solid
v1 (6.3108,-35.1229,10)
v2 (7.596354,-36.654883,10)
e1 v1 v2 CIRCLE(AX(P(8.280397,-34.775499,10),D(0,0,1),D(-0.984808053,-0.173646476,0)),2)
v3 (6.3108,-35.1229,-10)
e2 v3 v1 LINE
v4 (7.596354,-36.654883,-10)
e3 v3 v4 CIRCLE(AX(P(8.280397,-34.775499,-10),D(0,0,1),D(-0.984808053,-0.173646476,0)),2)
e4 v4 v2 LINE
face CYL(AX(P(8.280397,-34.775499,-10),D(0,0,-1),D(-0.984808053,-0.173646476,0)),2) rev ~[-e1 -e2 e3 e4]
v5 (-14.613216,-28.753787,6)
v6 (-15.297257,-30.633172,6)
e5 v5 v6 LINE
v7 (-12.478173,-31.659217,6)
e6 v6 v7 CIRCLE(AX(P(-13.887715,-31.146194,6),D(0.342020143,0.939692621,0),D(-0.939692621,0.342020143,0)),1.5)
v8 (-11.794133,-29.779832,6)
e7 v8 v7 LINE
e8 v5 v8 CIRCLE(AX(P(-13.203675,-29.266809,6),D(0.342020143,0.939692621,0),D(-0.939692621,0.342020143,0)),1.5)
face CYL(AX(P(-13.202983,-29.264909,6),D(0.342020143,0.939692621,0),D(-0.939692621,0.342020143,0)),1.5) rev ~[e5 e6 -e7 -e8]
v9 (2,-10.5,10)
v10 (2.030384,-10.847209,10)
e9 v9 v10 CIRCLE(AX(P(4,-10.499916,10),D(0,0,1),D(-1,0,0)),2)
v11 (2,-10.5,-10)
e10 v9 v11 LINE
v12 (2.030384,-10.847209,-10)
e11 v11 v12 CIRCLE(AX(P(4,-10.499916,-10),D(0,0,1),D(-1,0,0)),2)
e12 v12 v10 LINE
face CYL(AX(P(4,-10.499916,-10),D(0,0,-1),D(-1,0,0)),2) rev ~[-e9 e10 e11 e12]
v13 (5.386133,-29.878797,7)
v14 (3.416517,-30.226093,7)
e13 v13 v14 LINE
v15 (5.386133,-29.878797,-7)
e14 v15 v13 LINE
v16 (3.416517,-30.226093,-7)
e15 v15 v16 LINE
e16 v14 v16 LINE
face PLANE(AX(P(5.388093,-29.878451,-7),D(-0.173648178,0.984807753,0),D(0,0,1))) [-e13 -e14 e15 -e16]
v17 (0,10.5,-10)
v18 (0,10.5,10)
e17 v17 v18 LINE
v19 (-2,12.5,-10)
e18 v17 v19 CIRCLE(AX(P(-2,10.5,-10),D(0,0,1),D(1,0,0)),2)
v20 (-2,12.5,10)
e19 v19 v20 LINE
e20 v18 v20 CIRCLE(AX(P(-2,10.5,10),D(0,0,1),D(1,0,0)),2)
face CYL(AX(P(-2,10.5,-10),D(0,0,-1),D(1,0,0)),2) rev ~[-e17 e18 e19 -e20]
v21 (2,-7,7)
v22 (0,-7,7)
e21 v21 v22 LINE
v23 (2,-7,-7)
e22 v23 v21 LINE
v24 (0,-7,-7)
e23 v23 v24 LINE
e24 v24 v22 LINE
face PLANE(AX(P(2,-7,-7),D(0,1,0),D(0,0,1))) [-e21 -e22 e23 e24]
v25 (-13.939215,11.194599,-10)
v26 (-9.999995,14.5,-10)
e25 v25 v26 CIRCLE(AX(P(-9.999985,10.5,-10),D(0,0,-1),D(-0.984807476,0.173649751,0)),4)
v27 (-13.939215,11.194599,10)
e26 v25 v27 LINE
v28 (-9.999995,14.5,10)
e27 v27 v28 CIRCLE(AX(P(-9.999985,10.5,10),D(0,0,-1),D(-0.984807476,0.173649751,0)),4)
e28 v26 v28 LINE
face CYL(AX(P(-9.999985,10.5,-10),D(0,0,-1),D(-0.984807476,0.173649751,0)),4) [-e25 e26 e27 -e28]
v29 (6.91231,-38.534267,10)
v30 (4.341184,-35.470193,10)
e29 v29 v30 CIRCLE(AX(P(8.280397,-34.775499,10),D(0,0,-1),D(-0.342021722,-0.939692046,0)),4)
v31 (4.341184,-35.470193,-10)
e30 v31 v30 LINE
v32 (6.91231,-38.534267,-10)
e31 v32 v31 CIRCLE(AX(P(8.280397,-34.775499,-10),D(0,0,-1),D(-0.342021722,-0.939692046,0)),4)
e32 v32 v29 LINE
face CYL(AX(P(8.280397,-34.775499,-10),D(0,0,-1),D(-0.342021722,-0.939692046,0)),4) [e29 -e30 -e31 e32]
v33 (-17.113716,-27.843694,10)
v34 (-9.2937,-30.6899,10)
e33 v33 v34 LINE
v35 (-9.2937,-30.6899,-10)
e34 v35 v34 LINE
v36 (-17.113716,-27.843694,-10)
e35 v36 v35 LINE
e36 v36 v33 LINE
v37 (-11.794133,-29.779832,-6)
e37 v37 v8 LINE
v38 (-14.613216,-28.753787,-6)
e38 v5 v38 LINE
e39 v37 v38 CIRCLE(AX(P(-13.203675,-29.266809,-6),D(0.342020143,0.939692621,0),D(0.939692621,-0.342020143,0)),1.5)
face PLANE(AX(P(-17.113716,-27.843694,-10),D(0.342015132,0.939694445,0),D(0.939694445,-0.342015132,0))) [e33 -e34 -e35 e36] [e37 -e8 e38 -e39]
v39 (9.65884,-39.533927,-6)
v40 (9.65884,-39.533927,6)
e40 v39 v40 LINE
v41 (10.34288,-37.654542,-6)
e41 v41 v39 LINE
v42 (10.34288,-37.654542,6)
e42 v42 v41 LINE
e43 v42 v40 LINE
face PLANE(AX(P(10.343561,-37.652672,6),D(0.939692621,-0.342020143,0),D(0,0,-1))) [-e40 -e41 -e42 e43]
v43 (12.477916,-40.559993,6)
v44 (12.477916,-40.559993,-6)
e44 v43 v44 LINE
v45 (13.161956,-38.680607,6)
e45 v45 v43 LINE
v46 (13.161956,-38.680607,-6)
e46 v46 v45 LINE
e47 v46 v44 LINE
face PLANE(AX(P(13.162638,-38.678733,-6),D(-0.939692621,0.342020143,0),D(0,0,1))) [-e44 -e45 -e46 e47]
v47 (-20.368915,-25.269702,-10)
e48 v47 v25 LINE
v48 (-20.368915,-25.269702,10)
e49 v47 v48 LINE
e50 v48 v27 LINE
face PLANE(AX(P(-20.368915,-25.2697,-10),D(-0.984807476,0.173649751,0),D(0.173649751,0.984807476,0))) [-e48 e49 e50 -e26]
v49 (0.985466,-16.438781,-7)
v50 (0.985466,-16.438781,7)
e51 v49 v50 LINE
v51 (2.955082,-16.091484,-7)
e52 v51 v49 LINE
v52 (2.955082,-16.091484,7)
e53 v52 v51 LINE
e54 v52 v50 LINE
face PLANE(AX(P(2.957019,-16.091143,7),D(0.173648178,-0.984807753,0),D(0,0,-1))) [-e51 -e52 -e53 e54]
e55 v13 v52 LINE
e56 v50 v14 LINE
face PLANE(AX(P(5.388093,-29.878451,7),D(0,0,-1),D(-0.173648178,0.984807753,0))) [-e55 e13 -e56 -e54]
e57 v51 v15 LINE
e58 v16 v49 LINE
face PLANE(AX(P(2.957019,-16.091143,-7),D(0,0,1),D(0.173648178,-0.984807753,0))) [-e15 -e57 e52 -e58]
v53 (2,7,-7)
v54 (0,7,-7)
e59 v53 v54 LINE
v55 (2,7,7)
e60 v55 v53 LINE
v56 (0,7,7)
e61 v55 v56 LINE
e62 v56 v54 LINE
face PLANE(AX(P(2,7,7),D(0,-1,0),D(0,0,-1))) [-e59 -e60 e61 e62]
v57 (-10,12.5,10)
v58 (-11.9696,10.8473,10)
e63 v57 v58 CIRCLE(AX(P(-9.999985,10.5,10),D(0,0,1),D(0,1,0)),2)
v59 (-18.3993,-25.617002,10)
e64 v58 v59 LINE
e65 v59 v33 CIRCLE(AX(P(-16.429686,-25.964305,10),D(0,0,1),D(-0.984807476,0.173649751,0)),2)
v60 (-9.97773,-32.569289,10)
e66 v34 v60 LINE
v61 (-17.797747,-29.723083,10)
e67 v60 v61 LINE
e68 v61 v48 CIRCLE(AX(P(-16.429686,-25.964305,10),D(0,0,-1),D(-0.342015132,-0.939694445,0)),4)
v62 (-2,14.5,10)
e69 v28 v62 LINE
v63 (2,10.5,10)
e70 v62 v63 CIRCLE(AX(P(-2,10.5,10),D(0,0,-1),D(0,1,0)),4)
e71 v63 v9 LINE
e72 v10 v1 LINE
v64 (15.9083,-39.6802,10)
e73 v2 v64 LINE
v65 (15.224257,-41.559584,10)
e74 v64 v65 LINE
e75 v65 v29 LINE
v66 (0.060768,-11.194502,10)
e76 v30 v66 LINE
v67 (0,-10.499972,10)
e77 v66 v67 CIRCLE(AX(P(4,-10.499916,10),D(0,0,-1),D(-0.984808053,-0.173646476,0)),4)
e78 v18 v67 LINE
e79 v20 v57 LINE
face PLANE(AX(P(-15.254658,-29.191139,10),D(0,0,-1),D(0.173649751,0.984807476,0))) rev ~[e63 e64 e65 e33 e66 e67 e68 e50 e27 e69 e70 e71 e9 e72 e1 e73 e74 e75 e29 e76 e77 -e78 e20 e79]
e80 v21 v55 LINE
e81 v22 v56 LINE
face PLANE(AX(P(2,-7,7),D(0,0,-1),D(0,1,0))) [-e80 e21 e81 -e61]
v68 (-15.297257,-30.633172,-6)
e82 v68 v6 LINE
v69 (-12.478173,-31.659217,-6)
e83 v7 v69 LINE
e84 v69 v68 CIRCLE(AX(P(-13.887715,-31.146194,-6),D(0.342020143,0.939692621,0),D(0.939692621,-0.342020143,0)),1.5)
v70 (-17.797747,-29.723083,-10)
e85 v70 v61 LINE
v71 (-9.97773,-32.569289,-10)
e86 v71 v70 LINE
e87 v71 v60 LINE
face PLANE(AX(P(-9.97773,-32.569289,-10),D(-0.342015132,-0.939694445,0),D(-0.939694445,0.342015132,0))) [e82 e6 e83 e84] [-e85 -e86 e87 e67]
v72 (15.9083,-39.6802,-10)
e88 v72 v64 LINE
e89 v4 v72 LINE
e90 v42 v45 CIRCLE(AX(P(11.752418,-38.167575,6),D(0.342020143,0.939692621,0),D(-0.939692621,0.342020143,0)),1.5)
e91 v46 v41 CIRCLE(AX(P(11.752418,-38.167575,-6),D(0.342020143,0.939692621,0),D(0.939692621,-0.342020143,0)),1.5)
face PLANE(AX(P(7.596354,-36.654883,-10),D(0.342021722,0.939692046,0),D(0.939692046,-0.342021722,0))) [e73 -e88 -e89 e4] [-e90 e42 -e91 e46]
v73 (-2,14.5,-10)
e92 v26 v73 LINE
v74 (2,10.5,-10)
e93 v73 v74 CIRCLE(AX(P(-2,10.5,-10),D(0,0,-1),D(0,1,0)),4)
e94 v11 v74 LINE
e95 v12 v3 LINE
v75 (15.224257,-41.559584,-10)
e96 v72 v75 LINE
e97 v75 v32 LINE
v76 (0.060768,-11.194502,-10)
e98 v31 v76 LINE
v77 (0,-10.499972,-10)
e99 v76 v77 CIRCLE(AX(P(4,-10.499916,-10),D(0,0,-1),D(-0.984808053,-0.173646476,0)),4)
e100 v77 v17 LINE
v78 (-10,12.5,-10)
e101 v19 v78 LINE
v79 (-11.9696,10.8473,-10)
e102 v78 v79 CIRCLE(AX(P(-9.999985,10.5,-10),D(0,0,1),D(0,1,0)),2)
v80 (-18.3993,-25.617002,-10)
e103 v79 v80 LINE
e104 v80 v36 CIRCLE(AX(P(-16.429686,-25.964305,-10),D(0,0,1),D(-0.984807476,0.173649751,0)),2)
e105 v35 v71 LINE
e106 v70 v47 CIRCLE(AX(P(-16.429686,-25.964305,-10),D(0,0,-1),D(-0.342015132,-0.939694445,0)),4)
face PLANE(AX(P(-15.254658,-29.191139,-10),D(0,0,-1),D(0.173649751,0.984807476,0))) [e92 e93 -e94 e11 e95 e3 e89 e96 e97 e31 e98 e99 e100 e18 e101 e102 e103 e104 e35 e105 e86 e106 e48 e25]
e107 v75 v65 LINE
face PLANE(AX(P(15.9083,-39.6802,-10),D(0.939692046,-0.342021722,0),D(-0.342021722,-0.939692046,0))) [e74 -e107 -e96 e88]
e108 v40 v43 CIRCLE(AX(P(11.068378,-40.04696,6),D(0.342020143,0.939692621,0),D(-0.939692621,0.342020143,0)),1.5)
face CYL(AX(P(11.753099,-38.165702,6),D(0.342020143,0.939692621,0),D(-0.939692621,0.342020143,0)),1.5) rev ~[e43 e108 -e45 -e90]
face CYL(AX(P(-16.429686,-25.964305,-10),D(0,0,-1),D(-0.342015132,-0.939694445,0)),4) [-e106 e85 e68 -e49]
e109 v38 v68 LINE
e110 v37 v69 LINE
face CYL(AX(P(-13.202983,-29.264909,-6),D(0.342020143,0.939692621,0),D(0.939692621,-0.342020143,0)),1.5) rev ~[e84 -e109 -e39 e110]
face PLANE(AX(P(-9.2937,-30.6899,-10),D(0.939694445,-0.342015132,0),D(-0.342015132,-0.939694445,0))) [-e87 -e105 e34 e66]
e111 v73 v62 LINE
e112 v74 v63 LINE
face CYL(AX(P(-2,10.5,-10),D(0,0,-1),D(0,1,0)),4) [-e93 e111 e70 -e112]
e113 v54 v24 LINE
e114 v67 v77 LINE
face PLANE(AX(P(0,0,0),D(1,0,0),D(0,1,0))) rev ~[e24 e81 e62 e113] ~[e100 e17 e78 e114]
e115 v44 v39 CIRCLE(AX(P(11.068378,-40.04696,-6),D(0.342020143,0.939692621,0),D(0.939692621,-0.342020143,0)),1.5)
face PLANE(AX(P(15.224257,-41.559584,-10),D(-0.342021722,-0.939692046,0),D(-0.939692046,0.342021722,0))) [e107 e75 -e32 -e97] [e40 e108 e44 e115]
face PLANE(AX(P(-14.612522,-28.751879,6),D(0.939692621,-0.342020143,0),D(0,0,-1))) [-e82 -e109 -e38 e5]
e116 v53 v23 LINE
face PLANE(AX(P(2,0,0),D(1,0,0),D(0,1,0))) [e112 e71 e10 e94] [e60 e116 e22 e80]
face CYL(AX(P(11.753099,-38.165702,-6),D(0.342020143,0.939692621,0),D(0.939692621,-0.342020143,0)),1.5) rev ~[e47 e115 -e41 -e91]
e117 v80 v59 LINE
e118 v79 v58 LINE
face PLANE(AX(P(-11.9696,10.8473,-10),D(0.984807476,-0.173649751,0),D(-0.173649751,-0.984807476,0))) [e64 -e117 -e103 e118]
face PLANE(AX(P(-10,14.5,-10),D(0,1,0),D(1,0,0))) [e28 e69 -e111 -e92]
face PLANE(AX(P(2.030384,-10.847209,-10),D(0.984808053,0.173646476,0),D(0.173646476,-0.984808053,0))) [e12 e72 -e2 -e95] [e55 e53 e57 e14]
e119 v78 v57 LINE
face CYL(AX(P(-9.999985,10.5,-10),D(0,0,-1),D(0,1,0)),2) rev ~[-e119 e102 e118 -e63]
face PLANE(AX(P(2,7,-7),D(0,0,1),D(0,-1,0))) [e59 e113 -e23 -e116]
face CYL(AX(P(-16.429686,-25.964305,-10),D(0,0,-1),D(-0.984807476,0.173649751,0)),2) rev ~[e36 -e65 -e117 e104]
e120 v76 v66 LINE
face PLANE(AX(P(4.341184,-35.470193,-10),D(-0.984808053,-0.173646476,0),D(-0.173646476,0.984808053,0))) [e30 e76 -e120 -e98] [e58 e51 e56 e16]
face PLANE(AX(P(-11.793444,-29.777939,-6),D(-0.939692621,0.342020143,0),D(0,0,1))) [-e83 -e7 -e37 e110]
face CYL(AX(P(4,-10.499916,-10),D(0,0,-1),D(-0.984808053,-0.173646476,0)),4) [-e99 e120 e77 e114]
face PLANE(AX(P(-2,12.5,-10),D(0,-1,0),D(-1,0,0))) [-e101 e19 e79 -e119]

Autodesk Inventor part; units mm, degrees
ref_plane "YZ Plane" through (0, 0, 0) normal (1, 0, 0) x (0, 1, 0)
ref_plane "XZ Plane" through (0, 0, 0) normal (0, 1, 0) x (-1, 0, 0)
ref_plane "XY Plane" through (0, 0, 0) normal (0, 0, 1) x (1, 0, 0)
sketch "スケッチ1" plane through (0, 0, 0) normal (1, 0, 0) x (0, 1, 0)
  line L0 (-10.5, -10) -> (10.5, -10)
  line L1 (10.5, -10) -> (10.5, 10)
  line L2 (10.5, 10) -> (-10.5, 10)
  line L3 (-10.5, 10) -> (-10.5, -10)
  line L4 (-10.5, -10) -> (10.5, 10) construction
  line L5 (10.5, -10) -> (-10.5, 10) construction
  point P0 (0, 0)
  dimension "d0" = 21
  dimension "d1" = 20
extrude "プレート1" add sketch "スケッチ1" along normal blind 2
sketch "スケッチ3" plane through (2.0304, -10.8473, -10) normal (-0.9848078, -0.1736482, 0) x (0.1736482, -0.9848078, 0)
  line L0 (0, 20) -> (0, 0)
  line L1 (0, 0) -> (24.65, 0)
  line L2 (24.65, 0) -> (24.65, 20)
  line L3 (24.65, 20) -> (0, 20)
edge flange "フランジ2" height 25 angle 10 thickness 2 bend radius 2 thickness toward (-0.9848078, -0.1736482, 0) relief tear relief width 2 relief depth 1 edges at (2, -10.5, 0) wall of the first edge with corners at (2.0304, -10.8473, 10) (2.0304, -10.8473, -10) (6.3108, -35.1229, -10) (6.3108, -35.1229, 10)
bend "曲げ2"
corner "コーナー2"
sketch "スケッチ5" plane through (2, 0, 0) normal (1, 0, 0) x (0, 0, -1)
  line L0 (7, -7) -> (-7, -7)
  line L1 (-7, -7) -> (-7, 7)
  line L2 (-7, 7) -> (7, 7)
  line L3 (7, 7) -> (7, -7)
  line L4 (7, -7) -> (-7, 7) construction
  line L5 (-7, -7) -> (7, 7) construction
  point P0 (0, 0)
  dimension "d27" = 14
  dimension "d28" = 14
extrude "押し出し2" cut sketch "スケッチ5" against normal blind 10
sketch "スケッチ6" plane through (6.3108, -35.1229, 10) normal (0.9848078, 0.1736482, 0) x (0, 0, -1)
  line L0 (17, 5.325) -> (3, 5.325)
  line L1 (3, 5.325) -> (3, 19.325)
  line L2 (3, 19.325) -> (17, 19.325)
  line L3 (17, 19.325) -> (17, 5.325)
  line L4 (17, 5.325) -> (3, 19.325) construction
  line L5 (3, 5.325) -> (17, 19.325) construction
  line L6 (20, 0) -> (20, 24.65) projected
  line L7 (17, 28.4442) -> (3, 28.4442) projected
  point P0 (10, 35.6851)
  point P1 (10, 12.325)
  point P2 (10, 12.325)
  point P3 (20, 12.325)
  point P4 (10, 12.325)
  point P5 (10, 28.4442)
  dimension "d31" = 14
  dimension "d32" = 14
extrude "押し出し3" cut sketch "スケッチ6" against normal blind 10
sketch "スケッチ7" plane through (7.5964, -36.6549, 10) normal (-0.3420201, -0.9396926, 0) x (-0.9396926, 0.3420201, 0)
  line L0 (0, -20) -> (0, 0)
  line L1 (0, 0) -> (-8.8453, 0)
  line L2 (-8.8453, 0) -> (-8.8453, -20)
  line L3 (-8.8453, -20) -> (0, -20)
edge flange "フランジ3" height 10 angle -60 thickness 2 bend radius 2 thickness toward (-0.3420201, -0.9396926, 0) relief tear relief width 2 relief depth 1 edges at (4.3412, -35.4701, 0) wall of the first edge with corners at (7.5964, -36.6549, -10) (7.5964, -36.6549, 10) (15.9083, -39.6802, 10) (15.9083, -39.6802, -10)
bend "曲げ3"
corner "コーナー3"
sketch "スケッチ8" plane through (15.9083, -39.6802, 10) normal (0.3420201, 0.9396926, 0) x (0.9396926, -0.3420201, 0)
  line L0 (-5.9226, 4) -> (-5.9226, 16)
  arc A0 (-2.9226, 16) -> (-5.9226, 16) centre (-4.4226, 16) ccw
  line L1 (-2.9226, 16) -> (-2.9226, 4)
  arc A1 (-5.9226, 4) -> (-2.9226, 4) centre (-4.4226, 4) ccw
  line L2 (-8.8453, 20) -> (0, 20) projected
  line L3 (0, 0) -> (-8.8453, 0) projected
  point P0 (-28.5203, 10)
  point P1 (-4.4226, 20)
  dimension "d45" = 4
  dimension "d46" = 4
  dimension "d47" = 1.5
extrude "押し出し4" cut sketch "スケッチ8" against normal blind 10
sketch "スケッチ25" plane through (-2, 12.5, -10) normal (0, 1, 0) x (-1, 0, 0)
  line L0 (0, 20) -> (0, 0)
  line L1 (0, 0) -> (8, 0)
  line L2 (8, 0) -> (8, 20)
  line L3 (8, 20) -> (0, 20)
edge flange "フランジ12" height 10 angle 90 thickness 2 bend radius 2 thickness toward (0, 1, 0) relief tear relief width 2 relief depth 1 edges at (0, 10.5, 0) wall of the first edge with corners at (-2, 12.5, 10) (-2, 12.5, -10) (-10, 12.5, -10) (-10, 12.5, 10)
bend "曲げ21"
corner "コーナー12"
sketch "スケッチ26" plane through (-11.9696, 10.8473, -10) normal (-0.9848078, 0.1736482, 0) x (-0.1736482, -0.9848078, 0)
  line L0 (0, 20) -> (0, 0)
  line L1 (0, 0) -> (37.0268, 0)
  line L2 (37.0268, 0) -> (37.0268, 20)
  line L3 (37.0268, 20) -> (0, 20)
edge flange "フランジ13" height 38.705 angle 80 thickness 2 bend radius 2 thickness toward (-0.9848078, 0.1736482, 0) relief tear relief width 2 relief depth 1 edges at (-10, 12.5, 0) wall of the first edge with corners at (-11.9696, 10.8473, 10) (-11.9696, 10.8473, -10) (-18.3993, -25.617, -10) (-18.3993, -25.617, 10)
bend "曲げ22"
corner "コーナー13"
sketch "スケッチ27" plane through (-17.1137, -27.8437, -10) normal (-0.3420201, -0.9396926, 0) x (0.9396926, -0.3420201, 0)
  line L0 (0, 20) -> (0, 0)
  line L1 (0, 0) -> (8.3218, 0)
  line L2 (8.3218, 0) -> (8.3218, 20)
  line L3 (8.3218, 20) -> (0, 20)
edge flange "フランジ14" height 10 angle 80 thickness 2 bend radius 2 thickness toward (-0.3420201, -0.9396926, 0) relief tear relief width 2 relief depth 1 edges at (-18.3993, -25.617, 0) wall of the first edge with corners at (-17.1137, -27.8437, 10) (-17.1137, -27.8437, -10) (-9.2937, -30.6899, -10) (-9.2937, -30.6899, 10)
bend "曲げ23"
corner "コーナー14"
sketch "スケッチ28" plane through (-9.2937, -30.6899, 10) normal (0.3420201, 0.9396926, 0) x (0.9396926, -0.3420201, 0)
  line L0 (-5.6609, 4) -> (-5.6609, 16)
  arc A0 (-2.6609, 16) -> (-5.6609, 16) centre (-4.1609, 16) ccw
  line L1 (-2.6609, 16) -> (-2.6609, 4)
  line L2 (-2.2781, 3) -> (-2.2781, 17) projected
  arc A1 (-5.6609, 4) -> (-2.6609, 4) centre (-4.1609, 4) ccw
  line L3 (0, 0) -> (-8.3218, 0) projected
  line L4 (0, 20) -> (-8.3218, 20) projected
  point P0 (-1.7633, 10)
  point P1 (-4.1609, 20)
  dimension "d224" = 4
  dimension "d225" = 4
  dimension "d226" = 1.5
extrude "押し出し6" cut sketch "スケッチ28" against normal blind 10
equation "\"d2\" = Thickness"
equation "\"d13\" = BendReliefWidth"
equation "\"d14\" = BendReliefDepth"
equation "\"d15\" = MinimumRemnant"
equation "\"d16\" = TransitionRadius"
equation "\"d19\" = BendRadius"
equation "\"d20\" = CornerReliefSize"
equation "\"d21\" = GapSize"
equation "\"d22\" = JacobiRadiusSize"
equation "\"d35\" = BendReliefWidth"
equation "\"d36\" = BendReliefDepth"
equation "\"d37\" = MinimumRemnant"
equation "\"d38\" = TransitionRadius"
equation "\"d41\" = BendRadius"
equation "\"d42\" = CornerReliefSize"
equation "\"d43\" = GapSize"
equation "\"d44\" = JacobiRadiusSize"
equation "\"d194\" = BendReliefWidth"
equation "\"d195\" = BendReliefDepth"
equation "\"d196\" = MinimumRemnant"
equation "\"d197\" = TransitionRadius"
equation "\"d200\" = BendRadius"
equation "\"d201\" = CornerReliefSize"
equation "\"d202\" = GapSize"
equation "\"d203\" = JacobiRadiusSize"
equation "\"d204\" = BendReliefWidth"
equation "\"d205\" = BendReliefDepth"
equation "\"d206\" = MinimumRemnant"
equation "\"d207\" = TransitionRadius"
equation "\"d210\" = BendRadius"
equation "\"d211\" = CornerReliefSize"
equation "\"d212\" = GapSize"
equation "\"d213\" = JacobiRadiusSize"
equation "\"d214\" = BendReliefWidth"
equation "\"d215\" = BendReliefDepth"
equation "\"d216\" = MinimumRemnant"
equation "\"d217\" = TransitionRadius"
equation "\"d220\" = BendRadius"
equation "\"d221\" = CornerReliefSize"
equation "\"d222\" = GapSize"
equation "\"d223\" = JacobiRadiusSize"
equation "\"BendRadius\" = Thickness"
equation "\"BendReliefWidth\" = Thickness"
equation "\"BendReliefDepth\" = 0.5 * Thickness"
equation "\"CornerReliefSize\" = 4 * Thickness"
equation "\"MinimumRemnant\" = 2 * Thickness"
equation "\"TransitionRadius\" = BendRadius"
equation "\"JacobiRadiusSize\" = BendRadius"
equation "\"GapSize\" = Thickness"
equation "\"Thickness\" = 2"
properties part number "ThumbPlate" material "アルミニウム 6061"
